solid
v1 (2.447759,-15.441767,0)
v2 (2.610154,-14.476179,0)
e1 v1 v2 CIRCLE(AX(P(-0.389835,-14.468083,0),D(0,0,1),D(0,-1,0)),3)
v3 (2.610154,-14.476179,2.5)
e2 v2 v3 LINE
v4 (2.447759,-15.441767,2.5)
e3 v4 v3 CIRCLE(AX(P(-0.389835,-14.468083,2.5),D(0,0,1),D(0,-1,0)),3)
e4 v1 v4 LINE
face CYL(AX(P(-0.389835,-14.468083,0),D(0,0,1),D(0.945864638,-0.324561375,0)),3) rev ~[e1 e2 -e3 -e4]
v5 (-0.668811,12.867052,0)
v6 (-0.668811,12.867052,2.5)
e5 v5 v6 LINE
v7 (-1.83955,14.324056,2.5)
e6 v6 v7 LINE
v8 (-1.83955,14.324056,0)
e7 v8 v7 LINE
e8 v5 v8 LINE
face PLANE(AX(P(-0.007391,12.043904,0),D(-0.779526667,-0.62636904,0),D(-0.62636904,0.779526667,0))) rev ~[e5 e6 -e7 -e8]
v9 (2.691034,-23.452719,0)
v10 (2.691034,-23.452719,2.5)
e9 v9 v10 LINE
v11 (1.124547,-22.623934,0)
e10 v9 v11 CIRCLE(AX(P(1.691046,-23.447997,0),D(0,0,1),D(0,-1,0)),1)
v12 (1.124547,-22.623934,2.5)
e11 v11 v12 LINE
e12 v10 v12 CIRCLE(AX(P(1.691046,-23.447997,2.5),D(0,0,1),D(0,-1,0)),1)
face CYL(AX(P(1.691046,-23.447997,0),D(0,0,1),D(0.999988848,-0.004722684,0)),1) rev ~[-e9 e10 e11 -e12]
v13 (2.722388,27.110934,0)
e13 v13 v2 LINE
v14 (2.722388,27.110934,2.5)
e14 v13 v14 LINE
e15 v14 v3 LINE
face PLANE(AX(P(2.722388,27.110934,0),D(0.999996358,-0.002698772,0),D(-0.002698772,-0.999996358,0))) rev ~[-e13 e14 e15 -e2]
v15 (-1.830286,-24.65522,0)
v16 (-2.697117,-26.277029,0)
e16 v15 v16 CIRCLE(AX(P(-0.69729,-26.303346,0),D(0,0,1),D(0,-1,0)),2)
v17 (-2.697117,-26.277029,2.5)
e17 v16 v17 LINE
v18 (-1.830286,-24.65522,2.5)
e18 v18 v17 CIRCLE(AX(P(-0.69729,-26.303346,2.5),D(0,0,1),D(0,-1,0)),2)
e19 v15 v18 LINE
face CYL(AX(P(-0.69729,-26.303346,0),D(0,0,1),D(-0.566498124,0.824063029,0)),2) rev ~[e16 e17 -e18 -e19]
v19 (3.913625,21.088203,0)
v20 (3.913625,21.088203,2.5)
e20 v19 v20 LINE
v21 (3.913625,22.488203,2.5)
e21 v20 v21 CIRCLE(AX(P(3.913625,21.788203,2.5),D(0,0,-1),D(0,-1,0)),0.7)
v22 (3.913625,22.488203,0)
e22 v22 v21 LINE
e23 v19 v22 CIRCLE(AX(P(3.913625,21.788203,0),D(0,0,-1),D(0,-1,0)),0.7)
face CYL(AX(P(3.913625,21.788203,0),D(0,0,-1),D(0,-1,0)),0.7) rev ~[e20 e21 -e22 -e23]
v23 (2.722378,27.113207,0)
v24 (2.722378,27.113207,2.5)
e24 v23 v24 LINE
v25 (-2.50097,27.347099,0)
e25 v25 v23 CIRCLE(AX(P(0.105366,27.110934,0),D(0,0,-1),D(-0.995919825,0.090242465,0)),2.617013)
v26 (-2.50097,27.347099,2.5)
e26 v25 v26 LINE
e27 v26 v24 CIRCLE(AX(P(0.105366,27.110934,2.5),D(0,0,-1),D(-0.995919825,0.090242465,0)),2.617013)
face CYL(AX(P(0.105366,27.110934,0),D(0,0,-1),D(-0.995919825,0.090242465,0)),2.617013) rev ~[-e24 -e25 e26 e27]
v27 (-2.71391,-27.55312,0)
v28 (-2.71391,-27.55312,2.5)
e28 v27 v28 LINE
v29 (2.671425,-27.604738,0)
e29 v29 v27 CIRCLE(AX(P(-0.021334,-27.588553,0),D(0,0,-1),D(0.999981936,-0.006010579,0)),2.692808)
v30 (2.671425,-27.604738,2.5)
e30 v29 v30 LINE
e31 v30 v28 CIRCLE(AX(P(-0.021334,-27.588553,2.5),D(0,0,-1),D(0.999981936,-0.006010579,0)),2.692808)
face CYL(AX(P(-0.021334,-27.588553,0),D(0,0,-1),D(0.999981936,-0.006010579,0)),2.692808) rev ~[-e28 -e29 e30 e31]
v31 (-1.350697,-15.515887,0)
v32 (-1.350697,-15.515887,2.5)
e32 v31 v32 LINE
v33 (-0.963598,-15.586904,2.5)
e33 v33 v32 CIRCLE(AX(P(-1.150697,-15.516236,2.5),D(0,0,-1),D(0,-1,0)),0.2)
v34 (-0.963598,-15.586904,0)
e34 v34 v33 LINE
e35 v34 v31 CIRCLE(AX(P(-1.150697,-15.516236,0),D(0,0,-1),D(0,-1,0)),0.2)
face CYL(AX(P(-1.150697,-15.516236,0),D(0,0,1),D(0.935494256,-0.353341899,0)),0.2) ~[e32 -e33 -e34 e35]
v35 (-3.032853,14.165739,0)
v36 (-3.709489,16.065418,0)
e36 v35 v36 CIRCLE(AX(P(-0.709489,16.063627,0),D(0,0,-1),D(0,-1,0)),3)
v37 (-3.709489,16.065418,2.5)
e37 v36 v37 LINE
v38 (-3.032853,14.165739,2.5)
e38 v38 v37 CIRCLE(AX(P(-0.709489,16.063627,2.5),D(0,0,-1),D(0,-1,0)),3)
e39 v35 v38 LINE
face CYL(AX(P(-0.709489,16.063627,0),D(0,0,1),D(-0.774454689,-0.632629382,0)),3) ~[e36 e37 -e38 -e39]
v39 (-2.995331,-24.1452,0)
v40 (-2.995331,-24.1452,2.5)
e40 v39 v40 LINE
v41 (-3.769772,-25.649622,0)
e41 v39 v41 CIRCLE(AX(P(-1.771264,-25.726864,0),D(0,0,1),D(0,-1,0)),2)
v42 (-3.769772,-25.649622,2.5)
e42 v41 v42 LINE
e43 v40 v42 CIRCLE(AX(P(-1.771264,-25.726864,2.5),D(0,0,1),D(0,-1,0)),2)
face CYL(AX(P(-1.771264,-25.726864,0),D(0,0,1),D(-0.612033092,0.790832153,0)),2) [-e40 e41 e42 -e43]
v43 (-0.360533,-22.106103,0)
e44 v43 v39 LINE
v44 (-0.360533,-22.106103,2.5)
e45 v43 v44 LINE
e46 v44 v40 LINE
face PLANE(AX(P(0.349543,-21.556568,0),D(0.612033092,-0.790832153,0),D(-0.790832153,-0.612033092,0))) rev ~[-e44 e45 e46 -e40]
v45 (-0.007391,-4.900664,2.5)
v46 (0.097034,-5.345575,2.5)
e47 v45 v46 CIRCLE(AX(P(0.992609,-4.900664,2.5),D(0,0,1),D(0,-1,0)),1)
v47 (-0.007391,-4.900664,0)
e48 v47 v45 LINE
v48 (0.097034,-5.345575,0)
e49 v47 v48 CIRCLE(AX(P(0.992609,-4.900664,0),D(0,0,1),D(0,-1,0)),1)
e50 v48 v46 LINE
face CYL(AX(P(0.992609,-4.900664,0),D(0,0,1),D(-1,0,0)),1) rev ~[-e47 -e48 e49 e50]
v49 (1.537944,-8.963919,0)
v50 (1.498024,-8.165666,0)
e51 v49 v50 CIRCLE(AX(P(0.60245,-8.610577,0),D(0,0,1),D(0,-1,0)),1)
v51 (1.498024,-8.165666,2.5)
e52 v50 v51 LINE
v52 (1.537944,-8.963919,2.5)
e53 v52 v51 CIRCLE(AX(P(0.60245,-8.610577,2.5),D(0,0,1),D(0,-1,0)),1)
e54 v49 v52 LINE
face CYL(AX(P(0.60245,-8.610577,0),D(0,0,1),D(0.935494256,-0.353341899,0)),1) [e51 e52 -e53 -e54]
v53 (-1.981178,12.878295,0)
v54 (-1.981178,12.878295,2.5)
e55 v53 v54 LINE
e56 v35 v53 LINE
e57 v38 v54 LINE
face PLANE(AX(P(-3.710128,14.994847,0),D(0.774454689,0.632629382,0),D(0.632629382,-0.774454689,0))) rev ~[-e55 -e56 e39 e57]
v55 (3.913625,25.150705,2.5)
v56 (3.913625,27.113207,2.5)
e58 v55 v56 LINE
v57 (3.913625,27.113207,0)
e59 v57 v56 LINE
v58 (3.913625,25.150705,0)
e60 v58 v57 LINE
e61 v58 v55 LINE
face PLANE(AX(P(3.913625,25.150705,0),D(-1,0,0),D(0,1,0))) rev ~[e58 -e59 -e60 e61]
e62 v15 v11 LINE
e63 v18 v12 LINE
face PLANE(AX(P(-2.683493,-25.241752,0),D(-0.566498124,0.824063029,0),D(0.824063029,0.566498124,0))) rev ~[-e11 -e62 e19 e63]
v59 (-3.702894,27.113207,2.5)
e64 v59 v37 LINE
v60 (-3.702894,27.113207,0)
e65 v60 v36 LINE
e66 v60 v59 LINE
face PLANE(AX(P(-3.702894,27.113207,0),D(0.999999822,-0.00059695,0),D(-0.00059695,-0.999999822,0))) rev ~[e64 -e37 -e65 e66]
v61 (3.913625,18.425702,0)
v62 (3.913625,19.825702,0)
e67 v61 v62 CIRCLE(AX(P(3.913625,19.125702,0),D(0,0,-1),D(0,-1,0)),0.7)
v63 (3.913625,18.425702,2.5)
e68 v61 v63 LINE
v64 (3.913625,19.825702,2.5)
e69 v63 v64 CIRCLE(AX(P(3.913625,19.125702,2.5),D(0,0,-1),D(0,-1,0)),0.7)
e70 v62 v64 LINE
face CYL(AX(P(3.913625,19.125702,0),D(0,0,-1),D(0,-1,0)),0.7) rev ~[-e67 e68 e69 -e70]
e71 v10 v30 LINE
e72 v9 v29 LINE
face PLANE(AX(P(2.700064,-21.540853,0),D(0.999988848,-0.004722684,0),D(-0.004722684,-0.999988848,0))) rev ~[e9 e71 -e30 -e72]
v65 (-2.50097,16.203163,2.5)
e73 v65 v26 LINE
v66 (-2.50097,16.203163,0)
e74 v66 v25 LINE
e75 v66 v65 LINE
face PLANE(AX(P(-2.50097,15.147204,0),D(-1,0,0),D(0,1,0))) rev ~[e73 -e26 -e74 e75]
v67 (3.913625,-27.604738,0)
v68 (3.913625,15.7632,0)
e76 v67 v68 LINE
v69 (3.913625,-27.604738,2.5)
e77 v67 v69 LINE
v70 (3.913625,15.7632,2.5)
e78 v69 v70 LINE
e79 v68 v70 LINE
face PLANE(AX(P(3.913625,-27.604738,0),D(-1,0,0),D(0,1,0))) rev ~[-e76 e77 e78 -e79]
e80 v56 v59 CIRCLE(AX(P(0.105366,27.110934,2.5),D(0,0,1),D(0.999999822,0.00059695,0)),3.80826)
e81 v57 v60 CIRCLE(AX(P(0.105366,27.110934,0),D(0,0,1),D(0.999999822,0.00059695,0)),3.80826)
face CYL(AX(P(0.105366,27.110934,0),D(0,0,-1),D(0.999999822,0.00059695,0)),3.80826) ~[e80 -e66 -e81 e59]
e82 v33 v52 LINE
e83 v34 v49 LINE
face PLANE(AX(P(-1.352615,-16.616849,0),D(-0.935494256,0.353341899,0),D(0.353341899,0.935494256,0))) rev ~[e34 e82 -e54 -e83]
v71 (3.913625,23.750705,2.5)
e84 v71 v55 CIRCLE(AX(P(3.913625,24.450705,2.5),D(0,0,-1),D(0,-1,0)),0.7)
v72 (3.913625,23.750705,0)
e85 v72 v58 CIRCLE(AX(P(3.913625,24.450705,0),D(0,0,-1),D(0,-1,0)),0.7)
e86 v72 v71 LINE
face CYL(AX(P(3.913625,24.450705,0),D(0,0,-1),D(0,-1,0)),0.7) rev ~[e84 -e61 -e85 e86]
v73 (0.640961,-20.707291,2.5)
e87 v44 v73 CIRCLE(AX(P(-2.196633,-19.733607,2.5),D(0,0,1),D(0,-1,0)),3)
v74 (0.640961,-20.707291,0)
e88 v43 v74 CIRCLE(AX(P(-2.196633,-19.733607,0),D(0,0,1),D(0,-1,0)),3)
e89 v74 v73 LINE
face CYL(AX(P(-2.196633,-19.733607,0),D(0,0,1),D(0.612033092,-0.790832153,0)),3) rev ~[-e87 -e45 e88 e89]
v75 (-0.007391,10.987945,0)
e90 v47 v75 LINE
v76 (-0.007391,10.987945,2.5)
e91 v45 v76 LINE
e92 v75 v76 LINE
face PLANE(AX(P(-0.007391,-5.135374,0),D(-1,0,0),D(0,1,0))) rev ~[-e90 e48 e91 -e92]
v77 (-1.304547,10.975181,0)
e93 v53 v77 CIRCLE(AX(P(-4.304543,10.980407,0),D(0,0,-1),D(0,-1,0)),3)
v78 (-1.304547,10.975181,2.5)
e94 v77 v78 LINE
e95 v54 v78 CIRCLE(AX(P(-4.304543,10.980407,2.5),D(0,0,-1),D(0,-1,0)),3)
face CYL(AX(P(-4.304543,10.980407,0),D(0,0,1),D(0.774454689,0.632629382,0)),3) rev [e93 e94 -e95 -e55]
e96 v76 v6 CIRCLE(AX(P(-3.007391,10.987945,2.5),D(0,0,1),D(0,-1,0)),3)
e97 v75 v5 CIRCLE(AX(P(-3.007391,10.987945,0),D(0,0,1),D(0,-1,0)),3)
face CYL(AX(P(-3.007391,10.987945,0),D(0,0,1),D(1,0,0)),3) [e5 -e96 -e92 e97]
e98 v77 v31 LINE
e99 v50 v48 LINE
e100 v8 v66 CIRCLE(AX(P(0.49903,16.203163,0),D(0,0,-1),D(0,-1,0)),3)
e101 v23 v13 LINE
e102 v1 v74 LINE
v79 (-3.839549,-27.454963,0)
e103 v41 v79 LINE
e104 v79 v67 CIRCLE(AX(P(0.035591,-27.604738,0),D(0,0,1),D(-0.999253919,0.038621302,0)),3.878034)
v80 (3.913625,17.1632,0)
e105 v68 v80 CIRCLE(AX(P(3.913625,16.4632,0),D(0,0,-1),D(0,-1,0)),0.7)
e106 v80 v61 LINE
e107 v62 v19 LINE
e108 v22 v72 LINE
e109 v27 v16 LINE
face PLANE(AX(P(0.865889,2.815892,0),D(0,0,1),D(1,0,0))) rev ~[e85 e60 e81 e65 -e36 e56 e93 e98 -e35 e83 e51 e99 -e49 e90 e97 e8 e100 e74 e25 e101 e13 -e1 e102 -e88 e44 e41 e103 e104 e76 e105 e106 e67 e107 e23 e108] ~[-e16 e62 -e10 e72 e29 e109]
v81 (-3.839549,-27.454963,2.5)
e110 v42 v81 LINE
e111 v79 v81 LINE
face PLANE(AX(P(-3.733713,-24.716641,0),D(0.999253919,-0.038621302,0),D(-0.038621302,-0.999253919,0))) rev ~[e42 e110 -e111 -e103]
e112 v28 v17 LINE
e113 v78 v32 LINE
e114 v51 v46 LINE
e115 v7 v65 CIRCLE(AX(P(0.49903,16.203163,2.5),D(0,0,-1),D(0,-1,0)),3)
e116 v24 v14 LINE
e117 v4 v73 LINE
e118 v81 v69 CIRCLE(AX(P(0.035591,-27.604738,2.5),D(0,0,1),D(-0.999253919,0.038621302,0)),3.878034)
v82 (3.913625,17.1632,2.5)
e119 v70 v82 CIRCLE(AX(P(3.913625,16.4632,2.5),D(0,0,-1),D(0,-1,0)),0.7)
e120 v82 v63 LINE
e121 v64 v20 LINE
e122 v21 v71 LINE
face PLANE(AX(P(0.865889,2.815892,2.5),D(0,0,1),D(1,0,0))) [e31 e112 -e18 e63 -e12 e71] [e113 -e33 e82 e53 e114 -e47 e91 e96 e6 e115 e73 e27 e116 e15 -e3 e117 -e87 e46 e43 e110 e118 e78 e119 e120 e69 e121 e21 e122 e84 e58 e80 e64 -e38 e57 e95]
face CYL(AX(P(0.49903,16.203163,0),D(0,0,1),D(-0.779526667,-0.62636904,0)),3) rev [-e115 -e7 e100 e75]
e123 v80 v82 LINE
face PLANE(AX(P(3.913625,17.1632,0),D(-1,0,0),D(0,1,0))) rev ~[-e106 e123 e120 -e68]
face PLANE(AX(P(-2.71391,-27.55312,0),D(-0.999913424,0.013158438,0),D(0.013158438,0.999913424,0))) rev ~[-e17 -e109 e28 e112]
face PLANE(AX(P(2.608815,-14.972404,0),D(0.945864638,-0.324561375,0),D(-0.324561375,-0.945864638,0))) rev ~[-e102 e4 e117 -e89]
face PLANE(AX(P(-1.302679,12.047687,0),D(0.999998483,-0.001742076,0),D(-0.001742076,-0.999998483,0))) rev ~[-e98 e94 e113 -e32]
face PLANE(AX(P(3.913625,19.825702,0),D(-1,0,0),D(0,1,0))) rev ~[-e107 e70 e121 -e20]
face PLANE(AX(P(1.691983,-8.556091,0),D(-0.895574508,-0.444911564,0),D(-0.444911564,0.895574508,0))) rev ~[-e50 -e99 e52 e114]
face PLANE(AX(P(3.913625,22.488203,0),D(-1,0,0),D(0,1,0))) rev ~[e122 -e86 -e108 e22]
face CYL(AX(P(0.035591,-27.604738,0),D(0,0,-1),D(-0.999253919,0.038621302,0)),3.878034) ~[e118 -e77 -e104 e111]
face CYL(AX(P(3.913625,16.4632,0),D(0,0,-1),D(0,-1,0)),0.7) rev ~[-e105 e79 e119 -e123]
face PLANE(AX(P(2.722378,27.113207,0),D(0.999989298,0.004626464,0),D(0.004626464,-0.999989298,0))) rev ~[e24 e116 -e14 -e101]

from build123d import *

# Parameters (mm, degrees)
F1_DEPTH = 2.5
F2_R     = 1
F3_R     = 0.2
F4_R     = 1
F5_R     = 3
F6_R     = 3
F7_R     = 3
F8_R     = 3
F9_R     = 2
F10_R    = 2
F11_R    = 3
F12_R    = 1


# Not quite as in the source:
# - ends of sketch curves that miss each other by under 0.0002 mm in the source are joined


with BuildPart() as f1:
    # F0 (on Top) → F1 (new body)
    with BuildSketch(Plane.XY):
        with BuildLine():
            Line((-3.7337125044, -24.7166411829), (-3.8395490403, -27.4549634883))
            ThreePointArc((-3.8395490403, -27.4549634883), (-0.0393100387, -31.4820484538), (3.9136249429, -27.6047381979))
            Line((3.9136249429, -27.6047381979), (3.9136249429, 15.7631997109))
            ThreePointArc((3.9136249429, 15.7631997109), (3.2136249429, 16.4631997109), (3.9136249429, 17.1631997109))
            Line((3.9136249429, 17.1631997109), (3.9136249429, 18.4257015441))
            ThreePointArc((3.9136249429, 18.4257015441), (3.2136249429, 19.1257015441), (3.9136249429, 19.8257015441))
            Line((3.9136249429, 19.8257015441), (3.9136249429, 21.0882033773))
            ThreePointArc((3.9136249429, 21.0882033773), (3.2136249429, 21.7882033773), (3.9136249429, 22.4882033773))
            Line((3.9136249429, 22.4882033773), (3.9136249429, 23.7507052105))
            ThreePointArc((3.9136249429, 23.7507052105), (3.2136249429, 24.4507052105), (3.9136249429, 25.1507052105))
            Line((3.9136249429, 25.1507052105), (3.9136249429, 27.1132070437))
            ThreePointArc((3.9136249429, 27.1132070437), (0.1053655494, 30.9191937737), (-3.7028938442, 27.1132070437))
            Line((-3.7028938442, 27.1132070437), (-3.7101279046, 14.9948472524))
            Line((-3.7101279046, 14.9948472524), (-1.3026787113, 12.0476867709))
            Line((-1.3026787113, 12.0476867709), (-1.3526145996, -16.6168491978))
            Line((-1.3526145996, -16.6168491978), (1.6919830966, -8.5560908617))
            Line((1.6919830966, -8.5560908617), (-0.0073911714, -5.1353744853))
            Line((-0.0073911714, -5.1353744853), (-0.0073911714, 12.04390363))
            Line((-0.0073911714, 12.04390363), (-2.5009698886, 15.147203732))
            Line((-2.5009698886, 15.147203732), (-2.5009698886, 27.3470994339))
            ThreePointArc((-2.5009698886, 27.3470994339), (0.2224335348, 29.7253272746), (2.7223778727, 27.1132070292))
            Line((2.7223778727, 27.1132070292), (2.7223883904, 27.1109336758))
            Line((2.7223883904, 27.1109336758), (2.6088146402, -14.972403604))
            Line((2.6088146402, -14.972403604), (0.3495425781, -21.5565683108))
            Line((0.3495425781, -21.5565683108), (-3.7337125044, -24.7166411829))
        make_face()
        with BuildLine():
            ThreePointArc((2.6714254586, -27.6047381979), (-0.0471437397, -30.2812376007), (-2.7139096259, -27.5531197061))
            Line((-2.7139096259, -27.5531197061), (-2.6834930082, -25.2417523976))
            Line((-2.6834930082, -25.2417523976), (2.7000635964, -21.5408525771))
            Line((2.7000635964, -21.5408525771), (2.6714254586, -27.6047381979))
        make_face(mode=Mode.SUBTRACT)
    extrude(amount=F1_DEPTH)

    # F2
    f2_edges = [f1.edges().sort_by_distance(p)[0] for p in [
        (2.700064, -21.540853, 1.25),
    ]]
    fillet(f2_edges, radius=F2_R)

    # F3
    f3_edges = [f1.edges().sort_by_distance(p)[0] for p in [
        (-1.352615, -16.616849, 1.25),
    ]]
    fillet(f3_edges, radius=F3_R)

    # F4
    f4_edges = [f1.edges().sort_by_distance(p)[0] for p in [
        (1.691983, -8.556091, 1.25),
    ]]
    fillet(f4_edges, radius=F4_R)

    # F5
    f5_edges = [f1.edges().sort_by_distance(p)[0] for p in [
        (-2.50097, 15.147204, 1.25),
    ]]
    fillet(f5_edges, radius=F5_R)

    # F6
    f6_edges = [f1.edges().sort_by_distance(p)[0] for p in [
        (-3.710128, 14.994847, 1.25),
    ]]
    fillet(f6_edges, radius=F6_R)

    # F7
    f7_edges = [f1.edges().sort_by_distance(p)[0] for p in [
        (-1.302679, 12.047687, 1.25),
    ]]
    fillet(f7_edges, radius=F7_R)

    # F8
    f8_edges = [f1.edges().sort_by_distance(p)[0] for p in [
        (-0.007391, 12.043904, 1.25),
    ]]
    fillet(f8_edges, radius=F8_R)

    # F9
    f9_edges = [f1.edges().sort_by_distance(p)[0] for p in [
        (-3.733713, -24.716641, 1.25),
    ]]
    fillet(f9_edges, radius=F9_R)

    # F10
    f10_edges = [f1.edges().sort_by_distance(p)[0] for p in [
        (-2.683493, -25.241752, 1.25),
    ]]
    fillet(f10_edges, radius=F10_R)

    # F11
    f11_edges = [f1.edges().sort_by_distance(p)[0] for p in [
        (0.349543, -21.556568, 1.25),
        (2.608815, -14.972404, 1.25),
    ]]
    fillet(f11_edges, radius=F11_R)

    # F12
    f12_edges = [f1.edges().sort_by_distance(p)[0] for p in [
        (-0.007391, -5.135374, 1.25),
    ]]
    fillet(f12_edges, radius=F12_R)


solid = f1.part
